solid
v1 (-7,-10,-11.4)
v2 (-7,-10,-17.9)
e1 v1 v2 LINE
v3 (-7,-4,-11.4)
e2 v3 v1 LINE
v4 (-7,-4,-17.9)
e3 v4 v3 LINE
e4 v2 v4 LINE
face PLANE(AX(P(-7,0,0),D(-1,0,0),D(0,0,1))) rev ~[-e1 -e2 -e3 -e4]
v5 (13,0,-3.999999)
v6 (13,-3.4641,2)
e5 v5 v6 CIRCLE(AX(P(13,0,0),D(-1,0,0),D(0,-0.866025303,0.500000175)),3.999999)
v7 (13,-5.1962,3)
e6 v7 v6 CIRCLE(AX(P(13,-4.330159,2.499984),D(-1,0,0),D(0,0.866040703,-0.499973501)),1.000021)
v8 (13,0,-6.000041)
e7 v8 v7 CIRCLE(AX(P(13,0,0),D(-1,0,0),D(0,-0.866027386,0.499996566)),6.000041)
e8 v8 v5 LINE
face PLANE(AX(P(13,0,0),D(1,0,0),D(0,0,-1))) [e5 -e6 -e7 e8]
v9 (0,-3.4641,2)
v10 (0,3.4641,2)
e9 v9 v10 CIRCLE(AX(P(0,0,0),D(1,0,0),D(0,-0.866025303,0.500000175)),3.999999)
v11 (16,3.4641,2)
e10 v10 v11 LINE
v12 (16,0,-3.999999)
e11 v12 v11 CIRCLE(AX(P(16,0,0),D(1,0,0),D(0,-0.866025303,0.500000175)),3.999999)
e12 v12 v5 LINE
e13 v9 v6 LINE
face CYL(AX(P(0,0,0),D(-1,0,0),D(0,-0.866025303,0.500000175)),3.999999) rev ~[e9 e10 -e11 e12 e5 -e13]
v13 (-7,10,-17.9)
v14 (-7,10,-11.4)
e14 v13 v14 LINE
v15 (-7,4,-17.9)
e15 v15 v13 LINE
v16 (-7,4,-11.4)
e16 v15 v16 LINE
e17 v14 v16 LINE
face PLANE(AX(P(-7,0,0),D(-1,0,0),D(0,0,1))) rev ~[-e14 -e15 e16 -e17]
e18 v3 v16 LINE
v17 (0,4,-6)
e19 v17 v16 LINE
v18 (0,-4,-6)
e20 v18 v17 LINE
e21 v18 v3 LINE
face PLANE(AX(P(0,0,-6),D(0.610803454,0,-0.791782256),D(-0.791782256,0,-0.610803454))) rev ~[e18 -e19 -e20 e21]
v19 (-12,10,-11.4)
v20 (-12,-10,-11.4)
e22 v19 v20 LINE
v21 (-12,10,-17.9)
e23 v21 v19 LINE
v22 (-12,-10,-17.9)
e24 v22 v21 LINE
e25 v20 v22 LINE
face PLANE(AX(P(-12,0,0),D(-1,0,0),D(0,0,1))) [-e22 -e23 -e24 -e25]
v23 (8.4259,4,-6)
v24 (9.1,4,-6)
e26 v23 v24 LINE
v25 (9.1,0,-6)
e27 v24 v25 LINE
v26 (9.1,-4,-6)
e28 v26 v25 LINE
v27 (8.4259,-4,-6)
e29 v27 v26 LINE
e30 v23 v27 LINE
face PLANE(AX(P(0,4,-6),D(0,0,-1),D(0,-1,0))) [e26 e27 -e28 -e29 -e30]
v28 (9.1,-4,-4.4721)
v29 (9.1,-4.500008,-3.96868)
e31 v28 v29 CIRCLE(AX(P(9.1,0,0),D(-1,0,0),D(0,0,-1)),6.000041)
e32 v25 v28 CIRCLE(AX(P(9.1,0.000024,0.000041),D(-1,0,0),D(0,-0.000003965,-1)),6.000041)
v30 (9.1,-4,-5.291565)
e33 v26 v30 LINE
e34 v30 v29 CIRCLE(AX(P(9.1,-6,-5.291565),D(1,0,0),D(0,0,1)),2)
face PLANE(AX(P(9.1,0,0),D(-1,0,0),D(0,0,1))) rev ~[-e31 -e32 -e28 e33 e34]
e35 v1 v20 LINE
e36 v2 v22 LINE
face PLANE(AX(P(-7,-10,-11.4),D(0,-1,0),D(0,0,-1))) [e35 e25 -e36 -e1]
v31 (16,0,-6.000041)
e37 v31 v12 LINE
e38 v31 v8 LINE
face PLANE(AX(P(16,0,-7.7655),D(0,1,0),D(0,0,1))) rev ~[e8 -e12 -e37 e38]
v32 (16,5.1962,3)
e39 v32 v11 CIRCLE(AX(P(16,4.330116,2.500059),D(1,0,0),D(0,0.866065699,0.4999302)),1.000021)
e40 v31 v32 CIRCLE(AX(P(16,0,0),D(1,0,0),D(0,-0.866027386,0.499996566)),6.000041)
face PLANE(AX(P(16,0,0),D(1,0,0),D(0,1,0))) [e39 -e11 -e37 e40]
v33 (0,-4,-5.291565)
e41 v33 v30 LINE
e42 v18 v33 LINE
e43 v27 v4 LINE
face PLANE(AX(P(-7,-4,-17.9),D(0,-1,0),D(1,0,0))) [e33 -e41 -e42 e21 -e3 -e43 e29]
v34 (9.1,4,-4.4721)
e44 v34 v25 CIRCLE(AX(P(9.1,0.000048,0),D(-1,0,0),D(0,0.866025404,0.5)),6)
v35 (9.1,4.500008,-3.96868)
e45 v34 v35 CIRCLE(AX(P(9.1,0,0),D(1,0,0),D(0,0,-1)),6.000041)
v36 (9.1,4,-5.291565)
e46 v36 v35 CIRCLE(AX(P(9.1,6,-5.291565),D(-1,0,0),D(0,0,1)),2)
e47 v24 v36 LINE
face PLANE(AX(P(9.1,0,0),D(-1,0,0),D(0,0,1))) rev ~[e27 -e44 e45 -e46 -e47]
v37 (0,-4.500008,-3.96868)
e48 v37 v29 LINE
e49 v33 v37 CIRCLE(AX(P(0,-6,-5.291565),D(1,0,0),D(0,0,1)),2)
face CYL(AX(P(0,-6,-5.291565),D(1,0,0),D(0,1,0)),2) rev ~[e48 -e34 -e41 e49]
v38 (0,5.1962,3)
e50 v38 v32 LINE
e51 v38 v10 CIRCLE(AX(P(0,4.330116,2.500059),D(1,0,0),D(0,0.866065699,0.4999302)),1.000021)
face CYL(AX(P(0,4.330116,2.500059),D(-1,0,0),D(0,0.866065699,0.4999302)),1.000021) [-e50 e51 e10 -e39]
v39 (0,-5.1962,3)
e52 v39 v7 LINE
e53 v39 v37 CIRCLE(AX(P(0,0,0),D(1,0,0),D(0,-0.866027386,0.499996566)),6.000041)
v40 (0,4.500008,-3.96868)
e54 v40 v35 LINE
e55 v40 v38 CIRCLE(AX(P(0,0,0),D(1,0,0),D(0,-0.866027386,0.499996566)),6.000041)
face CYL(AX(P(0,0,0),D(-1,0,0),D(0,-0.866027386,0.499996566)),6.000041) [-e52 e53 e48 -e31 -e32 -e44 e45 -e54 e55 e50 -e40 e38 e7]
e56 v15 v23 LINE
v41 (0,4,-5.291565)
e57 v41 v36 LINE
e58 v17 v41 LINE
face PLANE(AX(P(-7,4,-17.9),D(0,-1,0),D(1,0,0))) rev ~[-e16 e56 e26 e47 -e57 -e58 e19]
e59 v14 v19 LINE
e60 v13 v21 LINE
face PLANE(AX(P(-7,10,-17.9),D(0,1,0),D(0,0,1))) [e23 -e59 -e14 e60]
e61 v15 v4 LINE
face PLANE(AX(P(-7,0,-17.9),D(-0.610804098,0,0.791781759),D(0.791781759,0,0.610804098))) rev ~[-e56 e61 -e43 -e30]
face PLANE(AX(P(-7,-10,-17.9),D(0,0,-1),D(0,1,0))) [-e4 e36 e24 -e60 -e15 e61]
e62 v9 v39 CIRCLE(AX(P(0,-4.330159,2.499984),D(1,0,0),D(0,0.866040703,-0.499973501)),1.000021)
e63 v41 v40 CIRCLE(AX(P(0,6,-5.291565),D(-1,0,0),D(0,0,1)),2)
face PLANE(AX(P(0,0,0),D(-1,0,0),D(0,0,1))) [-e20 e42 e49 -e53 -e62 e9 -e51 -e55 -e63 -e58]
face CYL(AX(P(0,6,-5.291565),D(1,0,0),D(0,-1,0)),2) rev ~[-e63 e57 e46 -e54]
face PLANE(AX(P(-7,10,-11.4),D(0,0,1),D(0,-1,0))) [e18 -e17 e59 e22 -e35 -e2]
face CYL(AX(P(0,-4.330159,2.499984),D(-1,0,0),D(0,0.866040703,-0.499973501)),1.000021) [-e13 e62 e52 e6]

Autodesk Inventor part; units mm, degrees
ref_plane "YZ Plane" through (0, 0, 0) normal (1, 0, 0) x (0, 1, 0)
sketch "Sketch1" plane through (0, 0, 0) normal (1, 0, 0) x (0, 1, 0)
  arc A0 (-3.4641, 2) -> (3.4641, 2) centre (0, 0) ccw
  arc A1 (-5.1962, 3) -> (5.1962, 3) centre (0, 0) ccw
  arc A2 (5.1962, 3) -> (3.4641, 2) centre (4.3301, 2.5) ccw
  arc A3 (-3.4641, 2) -> (-5.1962, 3) centre (-4.3301, 2.5) ccw
  dimension "d0" = 8
  dimension "d1" = 12
  dimension "d2" = 2.5
extrude "Extrusion1" add sketch "Sketch1" along normal blind 16
sketch "Sketch4" plane through (16, 0, 0) normal (1, 0, 0) x (0, 0, -1)
  point P0 (0, 0)
sketch "Sketch5" plane through (16, 0, 0) normal (1, 0, 0) x (0, 0, -1)
  line L0 (-6.2503, -10.1933) -> (7.7655, -10.1933)
  line L1 (7.7655, -10.1933) -> (7.7655, 0)
  line L2 (7.7655, 0) -> (-6.2503, 0)
  line L3 (-6.2503, 0) -> (-6.2503, -10.1933)
  point P0 (0, 0)
extrude "Extrusion4" cut sketch "Sketch5" against normal blind 3
ref_plane "Work Plane1" through (-7, 0, 0) normal (-1, 0, 0) x (0, 0, 1)
sketch "Sketch9" plane through (-7, 0, 0) normal (-1, 0, 0) x (0, 0, 1)
  line L0 (-17.9, 10) -> (-11.4, 10)
  line L1 (-11.4, 10) -> (-11.4, -10)
  line L2 (-11.4, -10) -> (-17.9, -10)
  line L3 (-17.9, -10) -> (-17.9, 10)
  point P0 (0, 0)
  point P1 (-17.9, 0)
  dimension "d34" = 11.4
  dimension "d35" = 6.5
  dimension "d36" = 20
extrude "Extrusion8" add sketch "Sketch9" along normal blind 5
ref_plane "Work Plane2" through (-7, 0, -17.9) normal (0, -1, 0) x (1, 0, 0)
sketch "Sketch10" plane through (-7, 0, -17.9) normal (0, -1, 0) x (1, 0, 0)
  line L0 (7, 11) -> (23, 11) projected
  line L1 (0, 0) -> (0, 6.5) projected
  line L2 (7, 11.9) -> (0, 6.5)
  line L3 (0, 0) -> (-5, 0) projected
  line L4 (0, 6.5) -> (0, 0)
  line L5 (0, 0) -> (15.4259, 11.9)
  line L6 (7, 11.9) -> (7, 20.9) projected
  line L7 (15.4259, 11.9) -> (7, 11.9)
  point P0 (7, 17.9)
extrude "Extrusion9" add sketch "Sketch10" along normal mid plane 8
sketch "Sketch11" plane through (0, 0, 0) normal (-1, 0, 0) x (0, 0, 1)
  line L0 (-6, -4) -> (-6, 0) projected
  line L1 (-6, -4) -> (-4.4721, -4)
  arc A0 (-6, 0) -> (3, -5.1962) centre (0, 0) ccw projected
  line L2 (-6, 4) -> (-6, 0) projected
  line L3 (-6, 4) -> (-4.4721, 4)
  arc A1 (3, 5.1962) -> (-6, 0) centre (0, 0) ccw projected
extrude "Extrusion10" add sketch "Sketch11" against normal blind 9.1
fillet "Fillet3" radius 2 2 edges at (4.55, 4, -4.4721) (4.55, -4, -4.4721)
properties part number "Roller_Spacer"
